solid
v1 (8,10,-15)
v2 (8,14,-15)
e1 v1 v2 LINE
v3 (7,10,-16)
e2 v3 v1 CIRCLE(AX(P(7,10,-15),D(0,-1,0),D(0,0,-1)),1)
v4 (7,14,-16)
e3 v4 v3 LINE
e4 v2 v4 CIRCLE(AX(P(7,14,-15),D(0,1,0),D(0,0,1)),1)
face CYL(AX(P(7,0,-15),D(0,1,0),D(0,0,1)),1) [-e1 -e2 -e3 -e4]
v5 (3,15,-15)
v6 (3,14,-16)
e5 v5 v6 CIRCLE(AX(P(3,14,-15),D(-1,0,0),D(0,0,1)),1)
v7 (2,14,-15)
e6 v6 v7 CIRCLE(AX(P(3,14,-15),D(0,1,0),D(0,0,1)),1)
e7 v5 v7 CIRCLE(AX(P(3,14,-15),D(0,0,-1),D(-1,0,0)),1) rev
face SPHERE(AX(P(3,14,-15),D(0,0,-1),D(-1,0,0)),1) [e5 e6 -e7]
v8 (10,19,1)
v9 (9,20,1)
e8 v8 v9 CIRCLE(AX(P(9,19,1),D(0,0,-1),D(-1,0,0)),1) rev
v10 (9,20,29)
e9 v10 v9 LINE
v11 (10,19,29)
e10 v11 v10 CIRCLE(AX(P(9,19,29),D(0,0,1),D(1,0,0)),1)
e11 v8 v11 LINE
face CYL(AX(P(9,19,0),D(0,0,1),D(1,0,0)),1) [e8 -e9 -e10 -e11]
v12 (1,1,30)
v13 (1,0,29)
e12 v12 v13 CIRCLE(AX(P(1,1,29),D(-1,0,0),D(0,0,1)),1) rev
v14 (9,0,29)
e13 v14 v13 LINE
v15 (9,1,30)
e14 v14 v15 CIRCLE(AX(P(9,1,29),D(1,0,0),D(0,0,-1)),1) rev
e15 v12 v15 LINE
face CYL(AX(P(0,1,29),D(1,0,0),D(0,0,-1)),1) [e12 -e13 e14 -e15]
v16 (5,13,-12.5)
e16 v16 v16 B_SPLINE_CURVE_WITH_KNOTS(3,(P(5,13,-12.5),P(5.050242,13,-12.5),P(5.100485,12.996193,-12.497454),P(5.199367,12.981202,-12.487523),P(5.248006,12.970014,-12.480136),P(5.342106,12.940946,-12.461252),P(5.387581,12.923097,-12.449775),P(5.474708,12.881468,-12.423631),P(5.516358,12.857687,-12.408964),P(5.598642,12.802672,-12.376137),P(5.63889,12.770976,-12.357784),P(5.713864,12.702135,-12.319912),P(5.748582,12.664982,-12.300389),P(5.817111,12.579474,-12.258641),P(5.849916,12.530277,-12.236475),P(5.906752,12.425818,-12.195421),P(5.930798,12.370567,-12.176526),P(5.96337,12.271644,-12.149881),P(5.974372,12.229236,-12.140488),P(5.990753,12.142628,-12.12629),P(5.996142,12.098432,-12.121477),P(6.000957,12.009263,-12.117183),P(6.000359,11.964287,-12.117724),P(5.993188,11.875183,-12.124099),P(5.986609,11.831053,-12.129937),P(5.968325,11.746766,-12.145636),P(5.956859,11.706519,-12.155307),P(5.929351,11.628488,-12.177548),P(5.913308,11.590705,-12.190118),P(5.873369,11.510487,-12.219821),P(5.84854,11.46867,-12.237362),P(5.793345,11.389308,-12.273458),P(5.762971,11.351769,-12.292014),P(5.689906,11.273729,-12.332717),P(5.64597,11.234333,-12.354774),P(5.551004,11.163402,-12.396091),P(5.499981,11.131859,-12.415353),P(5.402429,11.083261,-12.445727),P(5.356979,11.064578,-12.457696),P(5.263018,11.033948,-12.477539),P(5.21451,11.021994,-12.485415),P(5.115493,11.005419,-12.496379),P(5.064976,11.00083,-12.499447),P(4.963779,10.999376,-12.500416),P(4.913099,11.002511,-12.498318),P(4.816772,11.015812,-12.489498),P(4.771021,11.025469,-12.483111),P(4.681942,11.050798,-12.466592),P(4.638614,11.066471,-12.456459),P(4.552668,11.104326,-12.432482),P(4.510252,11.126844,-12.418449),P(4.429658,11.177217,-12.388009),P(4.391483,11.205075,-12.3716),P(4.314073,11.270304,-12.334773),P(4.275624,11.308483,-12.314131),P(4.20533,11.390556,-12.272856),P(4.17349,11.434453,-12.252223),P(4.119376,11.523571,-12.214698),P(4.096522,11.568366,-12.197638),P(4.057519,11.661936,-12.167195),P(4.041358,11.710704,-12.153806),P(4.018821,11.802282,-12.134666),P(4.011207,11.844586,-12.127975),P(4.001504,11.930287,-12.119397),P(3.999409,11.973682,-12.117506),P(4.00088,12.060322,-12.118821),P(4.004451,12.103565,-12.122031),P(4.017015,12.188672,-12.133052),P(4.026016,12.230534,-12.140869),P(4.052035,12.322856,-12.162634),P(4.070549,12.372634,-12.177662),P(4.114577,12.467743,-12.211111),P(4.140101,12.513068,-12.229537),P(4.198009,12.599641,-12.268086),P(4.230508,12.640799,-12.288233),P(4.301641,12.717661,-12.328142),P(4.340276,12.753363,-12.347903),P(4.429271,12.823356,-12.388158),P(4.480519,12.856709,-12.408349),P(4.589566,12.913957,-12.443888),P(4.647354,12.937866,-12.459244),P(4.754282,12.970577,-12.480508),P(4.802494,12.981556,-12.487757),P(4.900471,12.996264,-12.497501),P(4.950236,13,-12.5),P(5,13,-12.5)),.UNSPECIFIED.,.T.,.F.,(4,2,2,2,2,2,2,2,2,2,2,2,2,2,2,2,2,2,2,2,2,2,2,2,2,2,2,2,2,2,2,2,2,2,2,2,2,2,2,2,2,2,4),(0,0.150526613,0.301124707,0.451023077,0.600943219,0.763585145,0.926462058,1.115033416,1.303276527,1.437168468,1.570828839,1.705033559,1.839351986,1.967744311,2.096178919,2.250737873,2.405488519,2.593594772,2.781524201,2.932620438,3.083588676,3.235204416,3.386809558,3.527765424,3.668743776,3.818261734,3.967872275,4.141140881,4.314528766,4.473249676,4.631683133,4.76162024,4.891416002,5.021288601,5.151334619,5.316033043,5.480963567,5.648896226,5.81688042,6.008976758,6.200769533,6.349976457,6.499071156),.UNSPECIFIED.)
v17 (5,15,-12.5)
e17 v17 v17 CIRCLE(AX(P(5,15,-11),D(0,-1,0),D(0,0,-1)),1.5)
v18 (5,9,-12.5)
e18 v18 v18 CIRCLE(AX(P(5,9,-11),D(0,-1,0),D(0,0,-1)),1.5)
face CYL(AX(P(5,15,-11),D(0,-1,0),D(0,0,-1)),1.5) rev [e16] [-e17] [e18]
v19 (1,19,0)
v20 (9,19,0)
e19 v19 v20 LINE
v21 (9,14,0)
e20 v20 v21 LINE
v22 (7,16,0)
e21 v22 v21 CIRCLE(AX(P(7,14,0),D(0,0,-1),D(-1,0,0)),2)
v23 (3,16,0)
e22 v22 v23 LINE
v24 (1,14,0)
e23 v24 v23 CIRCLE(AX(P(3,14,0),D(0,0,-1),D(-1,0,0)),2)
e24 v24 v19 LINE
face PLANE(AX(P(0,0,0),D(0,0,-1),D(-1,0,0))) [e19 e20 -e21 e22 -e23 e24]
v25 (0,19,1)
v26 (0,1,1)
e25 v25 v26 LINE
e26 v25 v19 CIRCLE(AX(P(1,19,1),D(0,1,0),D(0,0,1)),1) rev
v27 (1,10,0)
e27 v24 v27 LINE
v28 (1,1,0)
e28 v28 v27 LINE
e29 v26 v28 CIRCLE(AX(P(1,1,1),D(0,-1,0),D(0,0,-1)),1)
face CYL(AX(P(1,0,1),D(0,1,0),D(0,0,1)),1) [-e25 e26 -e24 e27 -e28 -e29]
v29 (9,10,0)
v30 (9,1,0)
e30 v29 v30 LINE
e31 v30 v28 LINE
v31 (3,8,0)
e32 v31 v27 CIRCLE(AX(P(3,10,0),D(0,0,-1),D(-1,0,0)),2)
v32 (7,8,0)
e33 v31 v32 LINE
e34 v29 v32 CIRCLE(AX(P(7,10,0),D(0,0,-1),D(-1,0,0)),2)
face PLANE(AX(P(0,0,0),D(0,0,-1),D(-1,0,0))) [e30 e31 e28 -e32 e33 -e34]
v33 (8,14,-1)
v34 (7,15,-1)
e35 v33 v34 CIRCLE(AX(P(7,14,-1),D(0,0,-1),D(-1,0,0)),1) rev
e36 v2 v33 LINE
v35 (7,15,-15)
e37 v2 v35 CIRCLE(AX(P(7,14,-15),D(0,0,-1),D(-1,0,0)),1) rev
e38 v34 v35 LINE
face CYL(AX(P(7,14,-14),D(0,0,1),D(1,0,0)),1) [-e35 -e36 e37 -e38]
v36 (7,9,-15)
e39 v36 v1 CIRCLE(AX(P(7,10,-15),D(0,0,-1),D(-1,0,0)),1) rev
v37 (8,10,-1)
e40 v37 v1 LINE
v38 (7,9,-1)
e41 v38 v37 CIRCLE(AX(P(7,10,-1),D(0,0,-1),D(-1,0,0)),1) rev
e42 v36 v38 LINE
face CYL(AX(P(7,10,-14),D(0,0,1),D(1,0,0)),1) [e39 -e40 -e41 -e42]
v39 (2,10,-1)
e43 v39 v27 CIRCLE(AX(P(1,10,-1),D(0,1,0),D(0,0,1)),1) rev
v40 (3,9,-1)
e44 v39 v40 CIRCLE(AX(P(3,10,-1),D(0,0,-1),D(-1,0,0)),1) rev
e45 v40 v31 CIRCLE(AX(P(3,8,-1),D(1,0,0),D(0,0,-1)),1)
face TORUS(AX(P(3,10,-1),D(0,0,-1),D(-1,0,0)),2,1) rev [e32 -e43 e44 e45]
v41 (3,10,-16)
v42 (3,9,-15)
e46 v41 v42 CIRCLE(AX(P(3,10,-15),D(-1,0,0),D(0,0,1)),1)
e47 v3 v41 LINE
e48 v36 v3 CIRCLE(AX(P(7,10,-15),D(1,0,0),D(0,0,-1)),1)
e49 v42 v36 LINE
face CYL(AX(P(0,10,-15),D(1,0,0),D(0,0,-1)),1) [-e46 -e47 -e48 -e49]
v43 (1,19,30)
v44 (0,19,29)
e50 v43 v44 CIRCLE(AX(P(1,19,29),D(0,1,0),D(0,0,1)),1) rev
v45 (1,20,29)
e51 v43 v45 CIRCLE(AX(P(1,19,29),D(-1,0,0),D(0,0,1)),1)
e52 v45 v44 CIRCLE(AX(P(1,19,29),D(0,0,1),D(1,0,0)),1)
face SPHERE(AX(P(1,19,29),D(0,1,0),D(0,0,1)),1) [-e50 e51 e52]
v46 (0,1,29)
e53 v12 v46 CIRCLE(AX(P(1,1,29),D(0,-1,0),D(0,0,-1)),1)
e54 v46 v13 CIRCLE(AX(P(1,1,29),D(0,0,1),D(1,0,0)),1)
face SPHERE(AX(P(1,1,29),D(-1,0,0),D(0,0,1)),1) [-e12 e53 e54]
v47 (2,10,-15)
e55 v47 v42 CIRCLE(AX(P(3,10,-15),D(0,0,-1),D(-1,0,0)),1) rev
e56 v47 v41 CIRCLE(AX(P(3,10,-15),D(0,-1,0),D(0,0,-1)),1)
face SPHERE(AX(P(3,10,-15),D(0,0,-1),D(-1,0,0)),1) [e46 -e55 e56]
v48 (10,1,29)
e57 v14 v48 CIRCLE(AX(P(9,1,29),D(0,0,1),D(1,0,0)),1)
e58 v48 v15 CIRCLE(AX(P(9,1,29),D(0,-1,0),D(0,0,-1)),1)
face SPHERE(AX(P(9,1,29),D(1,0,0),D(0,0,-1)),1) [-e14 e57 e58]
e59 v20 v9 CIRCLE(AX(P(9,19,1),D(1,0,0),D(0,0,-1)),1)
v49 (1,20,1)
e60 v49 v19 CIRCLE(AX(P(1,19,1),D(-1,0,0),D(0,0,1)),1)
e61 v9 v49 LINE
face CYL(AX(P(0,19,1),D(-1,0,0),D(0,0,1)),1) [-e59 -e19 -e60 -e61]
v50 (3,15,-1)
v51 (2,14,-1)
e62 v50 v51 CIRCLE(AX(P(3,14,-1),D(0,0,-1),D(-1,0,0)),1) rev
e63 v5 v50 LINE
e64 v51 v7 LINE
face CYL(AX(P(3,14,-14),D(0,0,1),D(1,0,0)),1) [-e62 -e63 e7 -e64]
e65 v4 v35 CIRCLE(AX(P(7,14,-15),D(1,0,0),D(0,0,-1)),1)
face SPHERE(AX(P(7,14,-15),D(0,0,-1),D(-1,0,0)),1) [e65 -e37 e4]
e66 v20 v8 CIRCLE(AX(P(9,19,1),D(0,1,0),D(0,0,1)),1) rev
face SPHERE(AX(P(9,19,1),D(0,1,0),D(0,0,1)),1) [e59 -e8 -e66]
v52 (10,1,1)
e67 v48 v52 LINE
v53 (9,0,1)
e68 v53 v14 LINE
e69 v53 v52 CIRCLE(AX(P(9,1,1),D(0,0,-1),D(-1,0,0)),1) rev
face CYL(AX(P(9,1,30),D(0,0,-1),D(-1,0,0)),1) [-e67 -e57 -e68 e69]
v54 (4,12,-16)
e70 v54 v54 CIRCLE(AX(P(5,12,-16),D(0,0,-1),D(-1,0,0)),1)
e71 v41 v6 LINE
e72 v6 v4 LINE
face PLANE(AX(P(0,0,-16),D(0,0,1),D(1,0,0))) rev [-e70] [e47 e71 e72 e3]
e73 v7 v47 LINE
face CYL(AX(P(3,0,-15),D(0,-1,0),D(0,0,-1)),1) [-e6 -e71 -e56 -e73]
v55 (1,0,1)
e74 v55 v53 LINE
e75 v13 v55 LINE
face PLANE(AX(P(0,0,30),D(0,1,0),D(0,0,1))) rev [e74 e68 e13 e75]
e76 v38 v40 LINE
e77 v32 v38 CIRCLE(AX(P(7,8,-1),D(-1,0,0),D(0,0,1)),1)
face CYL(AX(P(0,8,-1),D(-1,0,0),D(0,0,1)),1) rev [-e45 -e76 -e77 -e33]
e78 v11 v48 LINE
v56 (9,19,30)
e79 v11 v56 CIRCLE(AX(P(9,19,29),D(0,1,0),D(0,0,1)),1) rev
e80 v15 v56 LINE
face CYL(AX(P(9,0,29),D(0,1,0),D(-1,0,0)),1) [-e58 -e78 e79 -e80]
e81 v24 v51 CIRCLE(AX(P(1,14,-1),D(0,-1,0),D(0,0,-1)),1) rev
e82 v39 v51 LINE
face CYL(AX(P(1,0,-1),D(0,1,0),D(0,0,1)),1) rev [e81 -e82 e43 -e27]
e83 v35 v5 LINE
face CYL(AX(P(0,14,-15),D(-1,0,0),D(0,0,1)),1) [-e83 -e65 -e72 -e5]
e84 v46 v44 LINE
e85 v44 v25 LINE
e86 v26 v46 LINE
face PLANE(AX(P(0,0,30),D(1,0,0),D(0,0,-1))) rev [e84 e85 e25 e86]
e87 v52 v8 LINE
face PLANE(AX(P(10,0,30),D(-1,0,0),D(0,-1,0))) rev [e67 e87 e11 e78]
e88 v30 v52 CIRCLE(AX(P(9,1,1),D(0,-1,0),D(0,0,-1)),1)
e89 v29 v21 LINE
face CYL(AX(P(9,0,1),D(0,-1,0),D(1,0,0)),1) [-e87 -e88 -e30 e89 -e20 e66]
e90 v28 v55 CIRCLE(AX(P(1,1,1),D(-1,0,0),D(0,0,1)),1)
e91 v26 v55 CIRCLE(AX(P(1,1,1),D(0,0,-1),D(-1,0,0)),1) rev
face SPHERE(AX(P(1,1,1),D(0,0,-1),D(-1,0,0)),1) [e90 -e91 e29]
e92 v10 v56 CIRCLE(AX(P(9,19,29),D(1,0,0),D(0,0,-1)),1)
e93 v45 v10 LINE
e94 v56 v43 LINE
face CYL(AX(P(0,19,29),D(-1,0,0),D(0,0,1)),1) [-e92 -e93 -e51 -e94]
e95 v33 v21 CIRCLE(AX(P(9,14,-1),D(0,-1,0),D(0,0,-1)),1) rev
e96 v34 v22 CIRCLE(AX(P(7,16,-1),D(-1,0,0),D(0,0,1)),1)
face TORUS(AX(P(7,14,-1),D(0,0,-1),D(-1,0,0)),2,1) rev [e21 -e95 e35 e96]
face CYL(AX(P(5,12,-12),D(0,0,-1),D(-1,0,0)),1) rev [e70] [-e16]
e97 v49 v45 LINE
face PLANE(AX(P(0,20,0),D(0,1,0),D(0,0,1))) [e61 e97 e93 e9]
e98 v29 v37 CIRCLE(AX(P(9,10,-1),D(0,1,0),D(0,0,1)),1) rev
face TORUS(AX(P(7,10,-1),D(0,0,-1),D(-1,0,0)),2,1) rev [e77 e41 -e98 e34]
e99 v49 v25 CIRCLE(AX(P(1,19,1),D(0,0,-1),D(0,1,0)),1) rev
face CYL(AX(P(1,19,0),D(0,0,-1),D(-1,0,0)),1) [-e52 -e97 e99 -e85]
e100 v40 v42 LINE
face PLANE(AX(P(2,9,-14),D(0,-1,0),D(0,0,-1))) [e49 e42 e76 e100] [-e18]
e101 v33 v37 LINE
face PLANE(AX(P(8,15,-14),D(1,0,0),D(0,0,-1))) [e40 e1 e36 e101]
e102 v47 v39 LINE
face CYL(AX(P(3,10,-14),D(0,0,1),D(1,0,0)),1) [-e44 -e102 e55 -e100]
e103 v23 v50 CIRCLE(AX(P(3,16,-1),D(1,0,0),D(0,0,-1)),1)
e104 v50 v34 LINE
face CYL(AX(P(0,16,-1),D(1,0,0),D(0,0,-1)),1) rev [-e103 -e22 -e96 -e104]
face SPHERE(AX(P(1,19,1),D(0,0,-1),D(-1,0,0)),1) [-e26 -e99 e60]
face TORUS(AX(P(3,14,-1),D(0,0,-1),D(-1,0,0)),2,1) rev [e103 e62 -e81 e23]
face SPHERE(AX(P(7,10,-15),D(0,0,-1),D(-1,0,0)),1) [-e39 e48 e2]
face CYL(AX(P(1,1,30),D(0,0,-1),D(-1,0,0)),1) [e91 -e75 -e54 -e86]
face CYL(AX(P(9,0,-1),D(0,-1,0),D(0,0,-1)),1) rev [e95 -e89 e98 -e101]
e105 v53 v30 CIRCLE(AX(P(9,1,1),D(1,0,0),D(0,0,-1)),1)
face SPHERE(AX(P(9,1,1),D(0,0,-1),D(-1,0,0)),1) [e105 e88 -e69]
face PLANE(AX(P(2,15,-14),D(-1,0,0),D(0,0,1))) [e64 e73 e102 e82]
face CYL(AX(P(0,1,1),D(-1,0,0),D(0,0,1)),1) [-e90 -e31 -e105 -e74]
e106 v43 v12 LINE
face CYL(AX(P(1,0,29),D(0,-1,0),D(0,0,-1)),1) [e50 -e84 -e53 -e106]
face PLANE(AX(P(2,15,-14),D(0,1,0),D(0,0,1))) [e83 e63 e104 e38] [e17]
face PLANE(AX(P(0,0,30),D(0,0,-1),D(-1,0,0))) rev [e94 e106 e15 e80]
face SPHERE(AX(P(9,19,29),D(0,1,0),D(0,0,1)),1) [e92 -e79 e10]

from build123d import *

# Parameters (mm, degrees)
SKETCH_1_W          = 10
SKETCH_1_H          = 22
EXTRUDE_1_DEPTH     = 30
SKETCH_2_W          = 6
SKETCH_2_H          = 6
EXTRUDE_3_DEPTH     = 14
SKETCH_3_R          = 1.5
CUT_EXTRUDE_1_DEPTH = 6
SKETCH_6_W          = 10
SKETCH_6_H          = 30
CUT_EXTRUDE_2_DEPTH = 2
SKETCH_7_W          = 6
SKETCH_7_H          = 6
EXTRUDE_4_DEPTH     = 2
SKETCH_8_R          = 1
CUT_EXTRUDE_3_DEPTH = 4
FILLET_1_R          = 1


with BuildPart() as part:
    # 草图1 → 凸台-拉伸1 (new body)
    with BuildSketch(Plane.XY):
        with Locations((5, 11)):
            Rectangle(SKETCH_1_W, SKETCH_1_H)
    extrude(amount=EXTRUDE_1_DEPTH)

    # 草图2 → 凸台-拉伸3 (add)
    with BuildSketch(Plane.XY):
        with Locations((5, 12)):
            Rectangle(SKETCH_2_W, SKETCH_2_H)
    extrude(amount=-EXTRUDE_3_DEPTH)

    # 草图3 → 切除-拉伸1 (cut)
    with BuildSketch(Plane(origin=(0, 9, 0), x_dir=(-1, 0, 0), z_dir=(0, -1, 0))):
        with Locations(Location((-5, 11, 0), (0, 0, 90))):
            Circle(SKETCH_3_R)
    extrude(amount=-CUT_EXTRUDE_1_DEPTH, mode=Mode.SUBTRACT)

    # 草图6 → 切除-拉伸2 (cut)
    with BuildSketch(Plane(origin=(0, 22, 0), x_dir=(1, 0, 0), z_dir=(0, 1, 0))):
        with Locations((5, -15)):
            Rectangle(SKETCH_6_W, SKETCH_6_H)
    extrude(amount=-CUT_EXTRUDE_2_DEPTH, mode=Mode.SUBTRACT)

    # 草图7 → 凸台-拉伸4 (add)
    with BuildSketch(Plane(origin=(0, 0, -14), x_dir=(-1, 0, 0), z_dir=(0, 0, -1))):
        with Locations((-5, 12)):
            Rectangle(SKETCH_7_W, SKETCH_7_H)
    extrude(amount=EXTRUDE_4_DEPTH)

    # 草图8 → 切除-拉伸3 (cut)
    with BuildSketch(Plane(origin=(0, 0, -16), x_dir=(-1, 0, 0), z_dir=(0, 0, -1))):
        with Locations((-5, 12)):
            Circle(SKETCH_8_R)
    extrude(amount=-CUT_EXTRUDE_3_DEPTH, mode=Mode.SUBTRACT)

    # 圆角1
    fillet_1_edges = [part.edges().sort_by_distance(p)[0] for p in [
        (10, 10, 30),
        (2, 9, -8),
        (2, 15, -8),
        (8, 15, -8),
        (8, 9, -8),
        (2, 12, 0),
        (5, 9, 0),
        (8, 12, 0),
        (5, 15, 0),
        (0, 10, 30),
        (0, 10, 0),
        (0, 20, 15),
        (5, 20, 0),
        (10, 20, 15),
        (5, 20, 30),
        (2, 12, -16),
        (5, 15, -16),
        (8, 12, -16),
        (5, 9, -16),
        (10, 10, 0),
        (5, 0, 0),
        (10, 0, 15),
        (0, 0, 15),
        (5, 0, 30),
    ]]
    fillet(fillet_1_edges, radius=FILLET_1_R - 0.0001)  # a hair under: the kernel refuses the full size


solid = part.part
